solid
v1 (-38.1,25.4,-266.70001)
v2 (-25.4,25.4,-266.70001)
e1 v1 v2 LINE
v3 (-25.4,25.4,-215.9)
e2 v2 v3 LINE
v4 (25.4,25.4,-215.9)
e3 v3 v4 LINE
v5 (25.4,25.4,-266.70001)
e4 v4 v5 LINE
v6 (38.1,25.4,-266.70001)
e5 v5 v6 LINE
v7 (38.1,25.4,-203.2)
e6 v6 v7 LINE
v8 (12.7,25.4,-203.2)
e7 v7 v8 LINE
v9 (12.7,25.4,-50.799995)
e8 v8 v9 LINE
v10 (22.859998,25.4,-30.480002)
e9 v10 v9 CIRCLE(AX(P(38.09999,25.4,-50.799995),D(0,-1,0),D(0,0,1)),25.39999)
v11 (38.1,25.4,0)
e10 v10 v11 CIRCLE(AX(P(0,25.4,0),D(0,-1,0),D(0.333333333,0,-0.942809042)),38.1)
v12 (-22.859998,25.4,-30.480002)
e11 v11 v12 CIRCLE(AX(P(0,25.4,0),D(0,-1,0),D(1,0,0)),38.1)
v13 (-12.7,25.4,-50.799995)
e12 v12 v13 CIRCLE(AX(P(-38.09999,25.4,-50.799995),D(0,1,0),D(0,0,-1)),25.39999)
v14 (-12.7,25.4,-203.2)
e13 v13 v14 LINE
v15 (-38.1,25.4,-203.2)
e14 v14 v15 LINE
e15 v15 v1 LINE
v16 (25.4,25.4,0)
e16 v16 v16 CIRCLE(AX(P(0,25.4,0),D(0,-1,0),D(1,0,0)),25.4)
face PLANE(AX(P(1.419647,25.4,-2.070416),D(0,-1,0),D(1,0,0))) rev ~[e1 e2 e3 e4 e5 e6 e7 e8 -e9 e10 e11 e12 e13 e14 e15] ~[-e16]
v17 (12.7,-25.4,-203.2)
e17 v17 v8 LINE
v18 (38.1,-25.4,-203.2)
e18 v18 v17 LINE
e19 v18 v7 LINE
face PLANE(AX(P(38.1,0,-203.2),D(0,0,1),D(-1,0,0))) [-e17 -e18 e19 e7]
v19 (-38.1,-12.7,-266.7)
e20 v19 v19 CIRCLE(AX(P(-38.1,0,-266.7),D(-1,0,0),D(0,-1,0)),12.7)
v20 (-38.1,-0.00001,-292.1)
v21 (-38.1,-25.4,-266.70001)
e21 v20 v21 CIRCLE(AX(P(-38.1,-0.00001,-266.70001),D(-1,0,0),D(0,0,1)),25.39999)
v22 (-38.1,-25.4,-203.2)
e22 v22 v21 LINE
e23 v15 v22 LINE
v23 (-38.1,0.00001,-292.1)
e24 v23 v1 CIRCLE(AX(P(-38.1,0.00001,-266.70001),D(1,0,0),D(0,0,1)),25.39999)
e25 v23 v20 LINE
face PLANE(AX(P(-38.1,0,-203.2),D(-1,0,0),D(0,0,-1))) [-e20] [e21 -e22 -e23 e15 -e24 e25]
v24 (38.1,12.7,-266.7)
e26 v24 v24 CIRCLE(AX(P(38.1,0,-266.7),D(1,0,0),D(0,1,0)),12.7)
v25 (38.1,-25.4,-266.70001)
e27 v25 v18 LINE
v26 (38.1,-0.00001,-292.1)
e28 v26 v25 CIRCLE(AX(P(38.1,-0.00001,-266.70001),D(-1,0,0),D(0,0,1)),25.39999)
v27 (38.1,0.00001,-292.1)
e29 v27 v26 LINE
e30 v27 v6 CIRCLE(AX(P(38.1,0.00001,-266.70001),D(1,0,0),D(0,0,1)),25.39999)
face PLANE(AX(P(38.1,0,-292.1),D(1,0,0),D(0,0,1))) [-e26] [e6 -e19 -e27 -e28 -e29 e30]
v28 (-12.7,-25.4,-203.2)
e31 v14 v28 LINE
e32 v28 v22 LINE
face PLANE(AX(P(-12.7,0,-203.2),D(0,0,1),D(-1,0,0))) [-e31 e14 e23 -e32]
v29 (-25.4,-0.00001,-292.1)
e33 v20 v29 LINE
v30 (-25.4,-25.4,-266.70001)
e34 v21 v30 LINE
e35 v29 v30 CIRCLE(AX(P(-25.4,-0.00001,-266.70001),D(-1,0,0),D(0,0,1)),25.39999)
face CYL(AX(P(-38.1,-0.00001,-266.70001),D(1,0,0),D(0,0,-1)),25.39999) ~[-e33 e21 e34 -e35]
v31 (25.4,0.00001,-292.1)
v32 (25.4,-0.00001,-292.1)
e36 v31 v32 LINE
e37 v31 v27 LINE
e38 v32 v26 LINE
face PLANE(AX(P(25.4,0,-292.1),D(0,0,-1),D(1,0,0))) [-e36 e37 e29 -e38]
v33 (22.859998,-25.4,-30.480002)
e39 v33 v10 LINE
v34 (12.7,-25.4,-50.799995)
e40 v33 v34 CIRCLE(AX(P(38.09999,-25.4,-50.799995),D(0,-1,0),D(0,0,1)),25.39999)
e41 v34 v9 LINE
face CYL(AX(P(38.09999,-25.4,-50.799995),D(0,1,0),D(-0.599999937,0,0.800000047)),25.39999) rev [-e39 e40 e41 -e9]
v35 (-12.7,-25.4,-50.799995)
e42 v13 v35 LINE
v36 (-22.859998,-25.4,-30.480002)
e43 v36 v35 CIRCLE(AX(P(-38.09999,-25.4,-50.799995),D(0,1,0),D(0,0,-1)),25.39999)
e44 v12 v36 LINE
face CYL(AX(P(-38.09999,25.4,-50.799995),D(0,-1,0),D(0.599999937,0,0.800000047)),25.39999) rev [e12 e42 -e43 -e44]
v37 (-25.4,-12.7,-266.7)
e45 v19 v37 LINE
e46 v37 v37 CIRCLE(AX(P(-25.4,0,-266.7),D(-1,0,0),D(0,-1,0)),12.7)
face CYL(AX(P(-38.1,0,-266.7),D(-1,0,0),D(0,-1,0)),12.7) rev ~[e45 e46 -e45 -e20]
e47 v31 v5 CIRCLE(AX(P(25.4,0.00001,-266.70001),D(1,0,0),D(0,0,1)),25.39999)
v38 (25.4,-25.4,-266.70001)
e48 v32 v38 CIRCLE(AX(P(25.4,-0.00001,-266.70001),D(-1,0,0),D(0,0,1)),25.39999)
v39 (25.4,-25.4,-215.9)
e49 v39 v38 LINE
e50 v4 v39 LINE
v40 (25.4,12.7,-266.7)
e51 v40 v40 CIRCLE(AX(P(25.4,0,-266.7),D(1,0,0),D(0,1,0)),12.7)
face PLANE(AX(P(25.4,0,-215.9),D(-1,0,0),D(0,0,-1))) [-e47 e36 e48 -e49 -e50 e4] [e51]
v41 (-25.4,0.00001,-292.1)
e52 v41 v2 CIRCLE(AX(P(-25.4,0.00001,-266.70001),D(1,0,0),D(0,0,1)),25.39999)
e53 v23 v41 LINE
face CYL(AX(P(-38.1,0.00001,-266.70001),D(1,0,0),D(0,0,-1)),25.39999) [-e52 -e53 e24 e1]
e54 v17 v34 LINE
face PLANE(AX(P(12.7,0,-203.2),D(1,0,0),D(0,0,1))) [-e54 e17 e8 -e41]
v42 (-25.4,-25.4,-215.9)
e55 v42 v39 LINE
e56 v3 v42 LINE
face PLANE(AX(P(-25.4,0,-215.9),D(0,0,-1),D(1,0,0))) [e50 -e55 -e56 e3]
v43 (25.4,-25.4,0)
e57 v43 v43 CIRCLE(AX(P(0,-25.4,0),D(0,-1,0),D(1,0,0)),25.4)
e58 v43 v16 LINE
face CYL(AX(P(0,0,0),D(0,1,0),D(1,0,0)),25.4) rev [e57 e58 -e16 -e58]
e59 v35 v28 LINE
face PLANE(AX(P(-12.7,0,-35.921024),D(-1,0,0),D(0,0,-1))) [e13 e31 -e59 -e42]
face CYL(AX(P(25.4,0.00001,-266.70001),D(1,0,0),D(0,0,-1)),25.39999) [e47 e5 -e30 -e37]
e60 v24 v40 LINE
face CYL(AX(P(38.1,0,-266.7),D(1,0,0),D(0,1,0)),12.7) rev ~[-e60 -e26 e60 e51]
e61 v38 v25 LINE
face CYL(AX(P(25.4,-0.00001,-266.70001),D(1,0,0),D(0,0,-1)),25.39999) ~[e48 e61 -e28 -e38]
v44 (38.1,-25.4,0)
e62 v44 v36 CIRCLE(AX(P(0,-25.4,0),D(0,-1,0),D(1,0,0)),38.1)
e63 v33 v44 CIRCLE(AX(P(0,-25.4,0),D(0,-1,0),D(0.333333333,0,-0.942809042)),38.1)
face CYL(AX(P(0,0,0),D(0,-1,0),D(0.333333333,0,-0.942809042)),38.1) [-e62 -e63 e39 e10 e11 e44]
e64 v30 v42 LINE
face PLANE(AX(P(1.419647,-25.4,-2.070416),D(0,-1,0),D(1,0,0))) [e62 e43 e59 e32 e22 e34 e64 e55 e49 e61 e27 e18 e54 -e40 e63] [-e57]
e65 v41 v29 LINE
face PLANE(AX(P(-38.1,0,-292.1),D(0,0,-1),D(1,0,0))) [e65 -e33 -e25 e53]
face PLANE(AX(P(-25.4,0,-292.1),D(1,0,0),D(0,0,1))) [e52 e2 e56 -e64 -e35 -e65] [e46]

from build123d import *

# Parameters (mm, degrees)
F0_R     = 25.4
F1_DEPTH = 25.4
F2_R     = 25.39999
F3_R     = 12.7
F4_DEPTH = 12.7
F5_R     = 12.7
F6_DEPTH = 12.7


# Not quite as in the source:
# - a fillet or chamfer is up to 0.001 mm smaller than in the source, because OpenCascade refuses the exact size


with BuildPart() as f1:
    # F0 (on Front) → F1 (new body, symmetric)
    with BuildSketch(Plane.XZ):
        with BuildLine():
            ThreePointArc((12.7, -35.9210244843), (31.1085197333, -21.9970452561), (38.1, 0))
            ThreePointArc((38.1, 0), (-21.9970452561, 31.1085197333), (-12.7, -35.9210244843))
            ThreePointArc((-12.7, -35.9210244843), (0, -38.1), (12.7, -35.9210244843))
        make_face()
        Circle(F0_R, mode=Mode.SUBTRACT)
        with BuildLine():
            ThreePointArc((12.7, -35.9210244843), (0, -38.1), (-12.7, -35.9210244843))
            Line((-12.7, -35.9210244843), (-12.7, -203.2))
            Line((-12.7, -203.2), (-38.1, -203.2))
            Line((-38.1, -203.2), (-38.1, -292.1))
            Line((-38.1, -292.1), (-25.4, -292.1))
            Line((-25.4, -292.1), (-25.4, -215.9))
            Line((-25.4, -215.9), (25.4, -215.9))
            Line((25.4, -215.9), (25.4, -292.1))
            Line((25.4, -292.1), (38.1, -292.1))
            Line((38.1, -292.1), (38.1, -203.2))
            Line((38.1, -203.2), (12.7, -203.2))
            Line((12.7, -203.2), (12.7, -35.9210244843))
        make_face()
    extrude(amount=F1_DEPTH, both=True)

    # F2 (radius 25.4 in the source; OpenCascade refuses exactly that, so slightly less here)
    f2_edges = [f1.edges().sort_by_distance(p)[0] for p in [
        (12.7, 0, -35.921024),
        (-12.7, 0, -35.921024),
        (-31.75, -25.4, -292.1),
        (-31.75, 25.4, -292.1),
        (31.75, -25.4, -292.1),
        (31.75, 25.4, -292.1),
    ]]
    fillet(f2_edges, radius=F2_R)

    # F3 (on face) → F4 (cut, through all)
    with BuildSketch(Plane(origin=(-38.1, 0, 0), x_dir=(0, -1, 0), z_dir=(-1, 0, 0))):
        with Locations((0, -266.7)):
            Circle(F3_R)
    extrude(amount=-F4_DEPTH, mode=Mode.SUBTRACT)

    # F5 (on face) → F6 (cut, through all)
    with BuildSketch(Plane.YZ.offset(38.1)):
        with Locations((0, -266.7)):
            Circle(F5_R)
    extrude(amount=-F6_DEPTH, mode=Mode.SUBTRACT)


solid = f1.part
